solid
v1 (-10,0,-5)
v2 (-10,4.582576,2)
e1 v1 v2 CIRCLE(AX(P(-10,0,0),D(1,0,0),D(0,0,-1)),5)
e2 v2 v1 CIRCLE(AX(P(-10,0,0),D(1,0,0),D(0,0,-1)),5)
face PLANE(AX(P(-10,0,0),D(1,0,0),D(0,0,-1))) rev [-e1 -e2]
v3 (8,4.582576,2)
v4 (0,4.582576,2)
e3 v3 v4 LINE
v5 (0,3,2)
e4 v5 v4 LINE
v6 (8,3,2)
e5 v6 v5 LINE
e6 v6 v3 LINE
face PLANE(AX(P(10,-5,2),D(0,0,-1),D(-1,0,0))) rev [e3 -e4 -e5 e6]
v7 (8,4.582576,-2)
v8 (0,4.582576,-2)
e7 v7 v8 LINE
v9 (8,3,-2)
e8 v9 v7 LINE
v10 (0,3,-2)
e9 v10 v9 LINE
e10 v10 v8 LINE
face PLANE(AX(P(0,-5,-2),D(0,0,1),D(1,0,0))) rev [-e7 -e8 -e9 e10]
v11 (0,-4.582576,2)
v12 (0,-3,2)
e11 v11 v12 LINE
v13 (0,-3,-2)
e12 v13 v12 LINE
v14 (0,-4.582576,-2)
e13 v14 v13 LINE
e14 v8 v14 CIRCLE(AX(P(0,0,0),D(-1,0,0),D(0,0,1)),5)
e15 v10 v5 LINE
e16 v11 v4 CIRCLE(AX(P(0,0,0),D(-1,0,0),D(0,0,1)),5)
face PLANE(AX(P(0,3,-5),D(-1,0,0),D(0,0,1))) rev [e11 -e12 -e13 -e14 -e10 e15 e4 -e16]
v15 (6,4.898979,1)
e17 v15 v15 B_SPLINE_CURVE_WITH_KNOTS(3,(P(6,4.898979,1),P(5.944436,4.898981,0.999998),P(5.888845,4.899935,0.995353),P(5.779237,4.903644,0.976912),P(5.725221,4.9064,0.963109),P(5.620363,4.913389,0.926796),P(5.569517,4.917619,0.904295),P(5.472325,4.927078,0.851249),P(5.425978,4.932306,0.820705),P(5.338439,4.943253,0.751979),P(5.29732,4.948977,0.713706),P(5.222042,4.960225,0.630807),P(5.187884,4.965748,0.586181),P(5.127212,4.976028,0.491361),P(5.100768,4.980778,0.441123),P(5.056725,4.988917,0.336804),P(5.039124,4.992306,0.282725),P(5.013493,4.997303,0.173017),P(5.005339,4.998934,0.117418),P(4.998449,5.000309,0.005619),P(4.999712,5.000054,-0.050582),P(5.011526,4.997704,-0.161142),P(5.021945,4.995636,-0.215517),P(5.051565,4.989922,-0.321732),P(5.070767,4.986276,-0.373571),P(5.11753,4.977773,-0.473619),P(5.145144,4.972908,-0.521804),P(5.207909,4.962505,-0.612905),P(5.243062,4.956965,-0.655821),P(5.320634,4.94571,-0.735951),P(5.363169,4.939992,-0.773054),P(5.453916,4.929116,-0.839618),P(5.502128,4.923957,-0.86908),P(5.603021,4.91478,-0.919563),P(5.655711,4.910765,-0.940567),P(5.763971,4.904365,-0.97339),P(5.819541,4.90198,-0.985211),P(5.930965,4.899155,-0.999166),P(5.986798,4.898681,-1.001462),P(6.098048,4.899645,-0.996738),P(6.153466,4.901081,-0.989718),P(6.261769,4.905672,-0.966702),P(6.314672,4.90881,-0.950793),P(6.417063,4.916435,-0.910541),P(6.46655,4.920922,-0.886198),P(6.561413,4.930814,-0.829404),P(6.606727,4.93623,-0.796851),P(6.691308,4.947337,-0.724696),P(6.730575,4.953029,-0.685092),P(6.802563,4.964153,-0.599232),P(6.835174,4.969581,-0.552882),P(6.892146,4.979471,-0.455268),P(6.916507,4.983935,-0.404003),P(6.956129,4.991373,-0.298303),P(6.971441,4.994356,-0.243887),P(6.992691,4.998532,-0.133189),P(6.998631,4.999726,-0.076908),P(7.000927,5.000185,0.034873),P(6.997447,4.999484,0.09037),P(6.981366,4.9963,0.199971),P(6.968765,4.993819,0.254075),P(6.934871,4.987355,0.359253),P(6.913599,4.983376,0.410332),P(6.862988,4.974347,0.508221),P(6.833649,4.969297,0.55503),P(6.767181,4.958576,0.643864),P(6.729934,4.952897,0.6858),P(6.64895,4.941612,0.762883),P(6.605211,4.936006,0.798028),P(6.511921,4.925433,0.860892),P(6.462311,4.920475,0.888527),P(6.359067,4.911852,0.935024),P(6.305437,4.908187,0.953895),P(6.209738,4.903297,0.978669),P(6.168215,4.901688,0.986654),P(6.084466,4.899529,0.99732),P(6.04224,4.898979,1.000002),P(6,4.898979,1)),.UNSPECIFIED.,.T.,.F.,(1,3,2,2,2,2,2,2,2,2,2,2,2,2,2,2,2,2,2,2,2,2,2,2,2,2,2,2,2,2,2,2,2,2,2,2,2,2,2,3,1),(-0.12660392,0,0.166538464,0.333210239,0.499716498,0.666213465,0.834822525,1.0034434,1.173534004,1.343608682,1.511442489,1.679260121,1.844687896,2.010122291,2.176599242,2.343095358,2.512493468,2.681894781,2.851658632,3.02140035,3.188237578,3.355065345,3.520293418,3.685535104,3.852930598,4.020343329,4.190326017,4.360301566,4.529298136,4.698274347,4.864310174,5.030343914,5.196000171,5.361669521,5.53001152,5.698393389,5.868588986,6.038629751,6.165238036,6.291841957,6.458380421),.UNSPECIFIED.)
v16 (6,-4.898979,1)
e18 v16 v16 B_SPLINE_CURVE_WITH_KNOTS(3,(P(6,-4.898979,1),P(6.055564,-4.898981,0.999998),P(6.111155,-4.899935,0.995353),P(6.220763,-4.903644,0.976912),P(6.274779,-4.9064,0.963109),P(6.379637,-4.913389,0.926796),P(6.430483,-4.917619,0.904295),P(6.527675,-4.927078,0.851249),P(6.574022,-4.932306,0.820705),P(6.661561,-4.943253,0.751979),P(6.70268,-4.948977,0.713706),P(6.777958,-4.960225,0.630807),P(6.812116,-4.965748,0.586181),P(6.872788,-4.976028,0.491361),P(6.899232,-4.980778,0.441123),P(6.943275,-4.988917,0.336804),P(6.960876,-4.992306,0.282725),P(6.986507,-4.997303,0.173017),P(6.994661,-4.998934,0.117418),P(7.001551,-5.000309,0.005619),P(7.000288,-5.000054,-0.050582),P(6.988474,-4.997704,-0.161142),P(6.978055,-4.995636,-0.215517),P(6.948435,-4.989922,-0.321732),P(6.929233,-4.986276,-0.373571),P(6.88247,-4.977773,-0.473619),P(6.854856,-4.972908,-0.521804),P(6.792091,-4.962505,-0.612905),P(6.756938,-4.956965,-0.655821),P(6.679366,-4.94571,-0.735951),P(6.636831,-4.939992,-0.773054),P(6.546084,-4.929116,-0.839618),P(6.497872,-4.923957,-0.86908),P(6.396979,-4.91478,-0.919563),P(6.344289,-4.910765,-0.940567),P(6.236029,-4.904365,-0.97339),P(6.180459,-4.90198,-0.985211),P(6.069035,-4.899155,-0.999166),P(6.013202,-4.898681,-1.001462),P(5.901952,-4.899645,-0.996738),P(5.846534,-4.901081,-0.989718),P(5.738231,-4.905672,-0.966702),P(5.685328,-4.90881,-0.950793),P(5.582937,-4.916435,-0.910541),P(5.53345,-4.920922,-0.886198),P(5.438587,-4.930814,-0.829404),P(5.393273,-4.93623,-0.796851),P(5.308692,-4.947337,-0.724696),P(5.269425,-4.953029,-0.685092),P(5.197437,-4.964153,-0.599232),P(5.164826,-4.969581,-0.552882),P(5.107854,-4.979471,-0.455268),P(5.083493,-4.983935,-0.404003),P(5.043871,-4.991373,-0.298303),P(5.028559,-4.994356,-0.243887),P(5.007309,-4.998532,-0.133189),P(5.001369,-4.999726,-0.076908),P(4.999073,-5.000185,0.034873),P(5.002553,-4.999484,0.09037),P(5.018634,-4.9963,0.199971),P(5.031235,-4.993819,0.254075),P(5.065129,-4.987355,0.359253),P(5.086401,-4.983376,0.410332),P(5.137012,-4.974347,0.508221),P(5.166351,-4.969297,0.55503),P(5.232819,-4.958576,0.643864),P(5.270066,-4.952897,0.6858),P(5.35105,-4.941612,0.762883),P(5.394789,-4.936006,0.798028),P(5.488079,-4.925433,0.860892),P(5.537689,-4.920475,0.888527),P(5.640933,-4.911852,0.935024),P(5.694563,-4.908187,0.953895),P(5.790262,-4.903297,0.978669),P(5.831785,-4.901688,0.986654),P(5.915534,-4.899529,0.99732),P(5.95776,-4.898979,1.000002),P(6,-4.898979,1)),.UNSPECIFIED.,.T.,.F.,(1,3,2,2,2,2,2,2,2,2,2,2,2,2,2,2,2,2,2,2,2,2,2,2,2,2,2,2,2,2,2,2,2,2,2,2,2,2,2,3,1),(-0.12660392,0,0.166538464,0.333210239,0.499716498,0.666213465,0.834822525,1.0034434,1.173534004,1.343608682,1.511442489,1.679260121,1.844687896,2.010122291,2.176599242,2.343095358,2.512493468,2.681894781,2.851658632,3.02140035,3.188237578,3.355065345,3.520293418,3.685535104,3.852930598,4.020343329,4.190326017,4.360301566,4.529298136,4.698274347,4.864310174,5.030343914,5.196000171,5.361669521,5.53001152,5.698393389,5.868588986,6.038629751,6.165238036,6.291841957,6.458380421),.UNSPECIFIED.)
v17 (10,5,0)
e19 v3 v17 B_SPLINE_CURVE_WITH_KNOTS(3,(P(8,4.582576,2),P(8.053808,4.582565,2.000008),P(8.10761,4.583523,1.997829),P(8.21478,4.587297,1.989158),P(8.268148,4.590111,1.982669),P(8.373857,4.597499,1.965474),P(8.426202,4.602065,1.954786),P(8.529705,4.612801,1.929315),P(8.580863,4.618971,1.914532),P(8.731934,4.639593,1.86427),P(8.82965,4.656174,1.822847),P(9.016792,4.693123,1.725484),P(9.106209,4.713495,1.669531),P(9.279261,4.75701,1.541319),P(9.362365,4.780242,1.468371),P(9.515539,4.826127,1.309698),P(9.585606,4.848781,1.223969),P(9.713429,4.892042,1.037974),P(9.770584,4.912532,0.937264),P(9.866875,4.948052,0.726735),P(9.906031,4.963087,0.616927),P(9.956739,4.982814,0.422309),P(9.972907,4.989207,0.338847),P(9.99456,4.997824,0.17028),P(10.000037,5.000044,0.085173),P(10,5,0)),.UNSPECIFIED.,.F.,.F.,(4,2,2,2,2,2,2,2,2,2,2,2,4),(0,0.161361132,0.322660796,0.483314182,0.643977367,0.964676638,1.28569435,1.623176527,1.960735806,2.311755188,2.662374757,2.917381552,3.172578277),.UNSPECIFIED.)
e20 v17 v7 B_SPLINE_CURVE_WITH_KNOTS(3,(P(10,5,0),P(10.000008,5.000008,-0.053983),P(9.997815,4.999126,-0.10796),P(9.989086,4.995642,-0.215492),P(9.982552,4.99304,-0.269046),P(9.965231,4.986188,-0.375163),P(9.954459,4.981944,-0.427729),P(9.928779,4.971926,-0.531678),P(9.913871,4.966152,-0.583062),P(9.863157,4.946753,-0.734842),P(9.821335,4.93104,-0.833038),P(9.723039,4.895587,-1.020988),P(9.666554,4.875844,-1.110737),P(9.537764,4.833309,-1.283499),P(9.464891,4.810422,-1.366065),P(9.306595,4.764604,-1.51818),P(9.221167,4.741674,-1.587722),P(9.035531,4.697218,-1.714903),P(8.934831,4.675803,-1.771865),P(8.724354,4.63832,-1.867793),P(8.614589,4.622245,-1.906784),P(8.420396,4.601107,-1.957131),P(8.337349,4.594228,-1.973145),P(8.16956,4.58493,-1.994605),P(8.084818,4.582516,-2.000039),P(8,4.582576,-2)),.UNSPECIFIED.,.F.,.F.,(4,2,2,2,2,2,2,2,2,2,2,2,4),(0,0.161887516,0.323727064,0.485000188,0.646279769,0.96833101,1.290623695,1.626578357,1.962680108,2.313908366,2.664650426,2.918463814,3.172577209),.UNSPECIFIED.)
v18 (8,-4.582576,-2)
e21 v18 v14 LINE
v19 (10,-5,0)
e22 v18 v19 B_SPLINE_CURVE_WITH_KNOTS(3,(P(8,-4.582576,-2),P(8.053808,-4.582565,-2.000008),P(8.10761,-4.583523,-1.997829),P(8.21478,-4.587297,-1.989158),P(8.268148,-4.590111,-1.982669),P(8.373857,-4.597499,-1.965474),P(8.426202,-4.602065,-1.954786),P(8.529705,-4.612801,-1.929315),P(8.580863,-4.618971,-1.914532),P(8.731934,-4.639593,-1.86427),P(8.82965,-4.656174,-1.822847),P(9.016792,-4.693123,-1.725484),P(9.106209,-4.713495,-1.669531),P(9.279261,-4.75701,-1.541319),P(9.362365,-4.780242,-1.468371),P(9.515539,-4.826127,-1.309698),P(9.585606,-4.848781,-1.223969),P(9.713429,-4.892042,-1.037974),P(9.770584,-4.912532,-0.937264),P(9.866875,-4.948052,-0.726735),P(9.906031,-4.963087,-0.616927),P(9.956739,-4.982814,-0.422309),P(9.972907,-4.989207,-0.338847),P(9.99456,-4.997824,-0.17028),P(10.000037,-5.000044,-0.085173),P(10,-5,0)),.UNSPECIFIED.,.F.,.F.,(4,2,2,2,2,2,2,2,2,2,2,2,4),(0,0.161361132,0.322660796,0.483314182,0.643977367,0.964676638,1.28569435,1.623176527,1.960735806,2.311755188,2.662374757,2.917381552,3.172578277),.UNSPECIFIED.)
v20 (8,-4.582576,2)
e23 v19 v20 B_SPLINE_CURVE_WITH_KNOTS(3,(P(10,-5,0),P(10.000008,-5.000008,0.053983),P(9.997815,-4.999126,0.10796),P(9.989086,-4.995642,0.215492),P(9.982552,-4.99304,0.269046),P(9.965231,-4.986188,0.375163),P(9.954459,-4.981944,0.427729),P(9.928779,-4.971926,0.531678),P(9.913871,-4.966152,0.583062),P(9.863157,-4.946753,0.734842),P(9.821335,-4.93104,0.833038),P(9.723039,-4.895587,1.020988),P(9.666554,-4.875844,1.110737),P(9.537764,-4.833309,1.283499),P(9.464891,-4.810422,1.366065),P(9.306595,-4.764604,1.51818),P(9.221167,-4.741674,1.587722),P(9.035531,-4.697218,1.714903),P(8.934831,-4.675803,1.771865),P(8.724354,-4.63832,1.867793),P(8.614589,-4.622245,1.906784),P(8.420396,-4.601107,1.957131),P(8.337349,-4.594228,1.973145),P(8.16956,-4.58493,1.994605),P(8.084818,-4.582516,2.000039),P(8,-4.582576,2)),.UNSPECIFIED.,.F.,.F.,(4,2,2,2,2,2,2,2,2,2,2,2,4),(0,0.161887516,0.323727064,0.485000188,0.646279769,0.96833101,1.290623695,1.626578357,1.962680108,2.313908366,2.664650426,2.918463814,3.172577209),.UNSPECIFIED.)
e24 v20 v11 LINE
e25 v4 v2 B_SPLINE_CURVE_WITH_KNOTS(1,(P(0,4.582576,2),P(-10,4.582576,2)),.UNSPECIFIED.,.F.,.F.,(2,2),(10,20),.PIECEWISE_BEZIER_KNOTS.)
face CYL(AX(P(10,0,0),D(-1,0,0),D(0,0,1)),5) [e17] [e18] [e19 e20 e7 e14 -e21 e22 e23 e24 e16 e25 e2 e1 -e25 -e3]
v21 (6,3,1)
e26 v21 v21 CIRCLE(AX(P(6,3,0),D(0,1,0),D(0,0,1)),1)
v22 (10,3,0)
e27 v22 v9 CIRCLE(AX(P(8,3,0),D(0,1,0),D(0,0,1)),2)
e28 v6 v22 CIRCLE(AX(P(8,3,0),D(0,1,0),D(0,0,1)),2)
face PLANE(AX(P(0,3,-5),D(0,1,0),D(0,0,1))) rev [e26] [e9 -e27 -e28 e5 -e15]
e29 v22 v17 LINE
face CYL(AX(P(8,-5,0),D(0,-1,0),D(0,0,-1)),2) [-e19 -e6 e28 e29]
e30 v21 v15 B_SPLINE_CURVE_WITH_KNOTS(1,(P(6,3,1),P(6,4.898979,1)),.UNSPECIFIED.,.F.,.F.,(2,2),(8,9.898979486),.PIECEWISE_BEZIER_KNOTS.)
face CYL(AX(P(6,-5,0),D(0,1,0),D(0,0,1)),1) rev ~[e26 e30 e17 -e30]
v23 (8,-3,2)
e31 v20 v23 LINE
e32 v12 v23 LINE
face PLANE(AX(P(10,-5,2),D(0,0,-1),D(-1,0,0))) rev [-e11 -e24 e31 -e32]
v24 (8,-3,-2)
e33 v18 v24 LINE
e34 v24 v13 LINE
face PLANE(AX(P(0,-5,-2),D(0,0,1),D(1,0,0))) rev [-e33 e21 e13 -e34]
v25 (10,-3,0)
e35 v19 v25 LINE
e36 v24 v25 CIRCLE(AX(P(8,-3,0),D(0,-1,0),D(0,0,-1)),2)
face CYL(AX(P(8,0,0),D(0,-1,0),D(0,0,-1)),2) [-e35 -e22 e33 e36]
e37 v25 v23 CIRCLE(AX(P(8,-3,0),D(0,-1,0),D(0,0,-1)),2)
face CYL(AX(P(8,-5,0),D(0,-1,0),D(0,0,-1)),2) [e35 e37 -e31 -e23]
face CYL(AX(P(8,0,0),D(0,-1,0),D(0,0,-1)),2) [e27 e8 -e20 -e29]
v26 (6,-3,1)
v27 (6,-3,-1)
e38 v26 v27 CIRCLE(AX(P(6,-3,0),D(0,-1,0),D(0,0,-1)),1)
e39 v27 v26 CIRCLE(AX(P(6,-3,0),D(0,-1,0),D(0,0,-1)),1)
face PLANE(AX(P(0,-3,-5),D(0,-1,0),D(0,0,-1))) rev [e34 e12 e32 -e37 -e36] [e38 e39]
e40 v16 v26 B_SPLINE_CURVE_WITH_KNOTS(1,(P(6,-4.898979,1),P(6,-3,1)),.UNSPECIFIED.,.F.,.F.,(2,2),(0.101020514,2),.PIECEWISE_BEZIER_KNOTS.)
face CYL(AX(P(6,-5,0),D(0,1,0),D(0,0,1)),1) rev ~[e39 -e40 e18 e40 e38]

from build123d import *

# Parameters (mm, degrees)
SKIZZE7_R                            = 5
AUFSATZ_LINEAR_AUSTRAGEN4_DEPTH      = 10
SCHNITT_LINEAR_AUSTRAGEN2_DEPTH      = 13.247448714
SCHNITT_LINEAR_AUSTRAGEN2_DEPTH_BACK = 13.247448714
SKIZZE8_W                            = 10
SKIZZE8_H                            = 6
SCHNITT_LINEAR_AUSTRAGEN3_DEPTH      = 13.247448714
SCHNITT_LINEAR_AUSTRAGEN3_DEPTH_BACK = 13.247448714
SKIZZE5_R                            = 1
SKIZZE5_W                            = 10
SKIZZE5_H                            = 3
VERRUNDUNG1_R                        = 2


with BuildPart() as part:
    # Skizze7 → Aufsatz-Linear austragen4 (new, symmetric)
    with BuildSketch(Plane(origin=(0, 0, 0), x_dir=(0, 0, -1), z_dir=(1, 0, 0))):
        Circle(SKIZZE7_R)
    extrude(amount=AUFSATZ_LINEAR_AUSTRAGEN4_DEPTH, both=True)

    # Skizze8 → Schnitt-Linear austragen2 (cut, two sides: drawn at the far end of the back side and taken through both)
    with BuildSketch(Plane.XY.offset(-SCHNITT_LINEAR_AUSTRAGEN2_DEPTH_BACK)):
        with Locations((5, 0)):
            Rectangle(SKIZZE8_W, SKIZZE8_H)
    extrude(amount=SCHNITT_LINEAR_AUSTRAGEN2_DEPTH + SCHNITT_LINEAR_AUSTRAGEN2_DEPTH_BACK, mode=Mode.SUBTRACT)

    # Skizze5 → Schnitt-Linear austragen3 (cut, two sides: drawn at the far end of the back side and taken through both)
    with BuildSketch(Plane(origin=(0, 0, 0), x_dir=(1, 0, 0), z_dir=(0, 1, 0)).offset(-SCHNITT_LINEAR_AUSTRAGEN3_DEPTH_BACK)):
        with Locations(Location((6, 0, 0), (0, 0, 270))):
            Circle(SKIZZE5_R)
        with Locations((5, 3.5)):
            Rectangle(SKIZZE5_W, SKIZZE5_H)
        with Locations((5, -3.5)):
            Rectangle(SKIZZE5_W, SKIZZE5_H)
    extrude(amount=SCHNITT_LINEAR_AUSTRAGEN3_DEPTH + SCHNITT_LINEAR_AUSTRAGEN3_DEPTH_BACK, mode=Mode.SUBTRACT)

    # Verrundung1
    verrundung1_edges = [part.edges().sort_by_distance(p)[0] for p in [
        (10, -3.791287847, -2),
        (10, -3.791287847, 2),
        (10, 3.791287847, -2),
        (10, 3.791287847, 2),
    ]]
    fillet(verrundung1_edges, radius=VERRUNDUNG1_R - 0.0001)  # a hair under: the kernel refuses the full size


solid = part.part
